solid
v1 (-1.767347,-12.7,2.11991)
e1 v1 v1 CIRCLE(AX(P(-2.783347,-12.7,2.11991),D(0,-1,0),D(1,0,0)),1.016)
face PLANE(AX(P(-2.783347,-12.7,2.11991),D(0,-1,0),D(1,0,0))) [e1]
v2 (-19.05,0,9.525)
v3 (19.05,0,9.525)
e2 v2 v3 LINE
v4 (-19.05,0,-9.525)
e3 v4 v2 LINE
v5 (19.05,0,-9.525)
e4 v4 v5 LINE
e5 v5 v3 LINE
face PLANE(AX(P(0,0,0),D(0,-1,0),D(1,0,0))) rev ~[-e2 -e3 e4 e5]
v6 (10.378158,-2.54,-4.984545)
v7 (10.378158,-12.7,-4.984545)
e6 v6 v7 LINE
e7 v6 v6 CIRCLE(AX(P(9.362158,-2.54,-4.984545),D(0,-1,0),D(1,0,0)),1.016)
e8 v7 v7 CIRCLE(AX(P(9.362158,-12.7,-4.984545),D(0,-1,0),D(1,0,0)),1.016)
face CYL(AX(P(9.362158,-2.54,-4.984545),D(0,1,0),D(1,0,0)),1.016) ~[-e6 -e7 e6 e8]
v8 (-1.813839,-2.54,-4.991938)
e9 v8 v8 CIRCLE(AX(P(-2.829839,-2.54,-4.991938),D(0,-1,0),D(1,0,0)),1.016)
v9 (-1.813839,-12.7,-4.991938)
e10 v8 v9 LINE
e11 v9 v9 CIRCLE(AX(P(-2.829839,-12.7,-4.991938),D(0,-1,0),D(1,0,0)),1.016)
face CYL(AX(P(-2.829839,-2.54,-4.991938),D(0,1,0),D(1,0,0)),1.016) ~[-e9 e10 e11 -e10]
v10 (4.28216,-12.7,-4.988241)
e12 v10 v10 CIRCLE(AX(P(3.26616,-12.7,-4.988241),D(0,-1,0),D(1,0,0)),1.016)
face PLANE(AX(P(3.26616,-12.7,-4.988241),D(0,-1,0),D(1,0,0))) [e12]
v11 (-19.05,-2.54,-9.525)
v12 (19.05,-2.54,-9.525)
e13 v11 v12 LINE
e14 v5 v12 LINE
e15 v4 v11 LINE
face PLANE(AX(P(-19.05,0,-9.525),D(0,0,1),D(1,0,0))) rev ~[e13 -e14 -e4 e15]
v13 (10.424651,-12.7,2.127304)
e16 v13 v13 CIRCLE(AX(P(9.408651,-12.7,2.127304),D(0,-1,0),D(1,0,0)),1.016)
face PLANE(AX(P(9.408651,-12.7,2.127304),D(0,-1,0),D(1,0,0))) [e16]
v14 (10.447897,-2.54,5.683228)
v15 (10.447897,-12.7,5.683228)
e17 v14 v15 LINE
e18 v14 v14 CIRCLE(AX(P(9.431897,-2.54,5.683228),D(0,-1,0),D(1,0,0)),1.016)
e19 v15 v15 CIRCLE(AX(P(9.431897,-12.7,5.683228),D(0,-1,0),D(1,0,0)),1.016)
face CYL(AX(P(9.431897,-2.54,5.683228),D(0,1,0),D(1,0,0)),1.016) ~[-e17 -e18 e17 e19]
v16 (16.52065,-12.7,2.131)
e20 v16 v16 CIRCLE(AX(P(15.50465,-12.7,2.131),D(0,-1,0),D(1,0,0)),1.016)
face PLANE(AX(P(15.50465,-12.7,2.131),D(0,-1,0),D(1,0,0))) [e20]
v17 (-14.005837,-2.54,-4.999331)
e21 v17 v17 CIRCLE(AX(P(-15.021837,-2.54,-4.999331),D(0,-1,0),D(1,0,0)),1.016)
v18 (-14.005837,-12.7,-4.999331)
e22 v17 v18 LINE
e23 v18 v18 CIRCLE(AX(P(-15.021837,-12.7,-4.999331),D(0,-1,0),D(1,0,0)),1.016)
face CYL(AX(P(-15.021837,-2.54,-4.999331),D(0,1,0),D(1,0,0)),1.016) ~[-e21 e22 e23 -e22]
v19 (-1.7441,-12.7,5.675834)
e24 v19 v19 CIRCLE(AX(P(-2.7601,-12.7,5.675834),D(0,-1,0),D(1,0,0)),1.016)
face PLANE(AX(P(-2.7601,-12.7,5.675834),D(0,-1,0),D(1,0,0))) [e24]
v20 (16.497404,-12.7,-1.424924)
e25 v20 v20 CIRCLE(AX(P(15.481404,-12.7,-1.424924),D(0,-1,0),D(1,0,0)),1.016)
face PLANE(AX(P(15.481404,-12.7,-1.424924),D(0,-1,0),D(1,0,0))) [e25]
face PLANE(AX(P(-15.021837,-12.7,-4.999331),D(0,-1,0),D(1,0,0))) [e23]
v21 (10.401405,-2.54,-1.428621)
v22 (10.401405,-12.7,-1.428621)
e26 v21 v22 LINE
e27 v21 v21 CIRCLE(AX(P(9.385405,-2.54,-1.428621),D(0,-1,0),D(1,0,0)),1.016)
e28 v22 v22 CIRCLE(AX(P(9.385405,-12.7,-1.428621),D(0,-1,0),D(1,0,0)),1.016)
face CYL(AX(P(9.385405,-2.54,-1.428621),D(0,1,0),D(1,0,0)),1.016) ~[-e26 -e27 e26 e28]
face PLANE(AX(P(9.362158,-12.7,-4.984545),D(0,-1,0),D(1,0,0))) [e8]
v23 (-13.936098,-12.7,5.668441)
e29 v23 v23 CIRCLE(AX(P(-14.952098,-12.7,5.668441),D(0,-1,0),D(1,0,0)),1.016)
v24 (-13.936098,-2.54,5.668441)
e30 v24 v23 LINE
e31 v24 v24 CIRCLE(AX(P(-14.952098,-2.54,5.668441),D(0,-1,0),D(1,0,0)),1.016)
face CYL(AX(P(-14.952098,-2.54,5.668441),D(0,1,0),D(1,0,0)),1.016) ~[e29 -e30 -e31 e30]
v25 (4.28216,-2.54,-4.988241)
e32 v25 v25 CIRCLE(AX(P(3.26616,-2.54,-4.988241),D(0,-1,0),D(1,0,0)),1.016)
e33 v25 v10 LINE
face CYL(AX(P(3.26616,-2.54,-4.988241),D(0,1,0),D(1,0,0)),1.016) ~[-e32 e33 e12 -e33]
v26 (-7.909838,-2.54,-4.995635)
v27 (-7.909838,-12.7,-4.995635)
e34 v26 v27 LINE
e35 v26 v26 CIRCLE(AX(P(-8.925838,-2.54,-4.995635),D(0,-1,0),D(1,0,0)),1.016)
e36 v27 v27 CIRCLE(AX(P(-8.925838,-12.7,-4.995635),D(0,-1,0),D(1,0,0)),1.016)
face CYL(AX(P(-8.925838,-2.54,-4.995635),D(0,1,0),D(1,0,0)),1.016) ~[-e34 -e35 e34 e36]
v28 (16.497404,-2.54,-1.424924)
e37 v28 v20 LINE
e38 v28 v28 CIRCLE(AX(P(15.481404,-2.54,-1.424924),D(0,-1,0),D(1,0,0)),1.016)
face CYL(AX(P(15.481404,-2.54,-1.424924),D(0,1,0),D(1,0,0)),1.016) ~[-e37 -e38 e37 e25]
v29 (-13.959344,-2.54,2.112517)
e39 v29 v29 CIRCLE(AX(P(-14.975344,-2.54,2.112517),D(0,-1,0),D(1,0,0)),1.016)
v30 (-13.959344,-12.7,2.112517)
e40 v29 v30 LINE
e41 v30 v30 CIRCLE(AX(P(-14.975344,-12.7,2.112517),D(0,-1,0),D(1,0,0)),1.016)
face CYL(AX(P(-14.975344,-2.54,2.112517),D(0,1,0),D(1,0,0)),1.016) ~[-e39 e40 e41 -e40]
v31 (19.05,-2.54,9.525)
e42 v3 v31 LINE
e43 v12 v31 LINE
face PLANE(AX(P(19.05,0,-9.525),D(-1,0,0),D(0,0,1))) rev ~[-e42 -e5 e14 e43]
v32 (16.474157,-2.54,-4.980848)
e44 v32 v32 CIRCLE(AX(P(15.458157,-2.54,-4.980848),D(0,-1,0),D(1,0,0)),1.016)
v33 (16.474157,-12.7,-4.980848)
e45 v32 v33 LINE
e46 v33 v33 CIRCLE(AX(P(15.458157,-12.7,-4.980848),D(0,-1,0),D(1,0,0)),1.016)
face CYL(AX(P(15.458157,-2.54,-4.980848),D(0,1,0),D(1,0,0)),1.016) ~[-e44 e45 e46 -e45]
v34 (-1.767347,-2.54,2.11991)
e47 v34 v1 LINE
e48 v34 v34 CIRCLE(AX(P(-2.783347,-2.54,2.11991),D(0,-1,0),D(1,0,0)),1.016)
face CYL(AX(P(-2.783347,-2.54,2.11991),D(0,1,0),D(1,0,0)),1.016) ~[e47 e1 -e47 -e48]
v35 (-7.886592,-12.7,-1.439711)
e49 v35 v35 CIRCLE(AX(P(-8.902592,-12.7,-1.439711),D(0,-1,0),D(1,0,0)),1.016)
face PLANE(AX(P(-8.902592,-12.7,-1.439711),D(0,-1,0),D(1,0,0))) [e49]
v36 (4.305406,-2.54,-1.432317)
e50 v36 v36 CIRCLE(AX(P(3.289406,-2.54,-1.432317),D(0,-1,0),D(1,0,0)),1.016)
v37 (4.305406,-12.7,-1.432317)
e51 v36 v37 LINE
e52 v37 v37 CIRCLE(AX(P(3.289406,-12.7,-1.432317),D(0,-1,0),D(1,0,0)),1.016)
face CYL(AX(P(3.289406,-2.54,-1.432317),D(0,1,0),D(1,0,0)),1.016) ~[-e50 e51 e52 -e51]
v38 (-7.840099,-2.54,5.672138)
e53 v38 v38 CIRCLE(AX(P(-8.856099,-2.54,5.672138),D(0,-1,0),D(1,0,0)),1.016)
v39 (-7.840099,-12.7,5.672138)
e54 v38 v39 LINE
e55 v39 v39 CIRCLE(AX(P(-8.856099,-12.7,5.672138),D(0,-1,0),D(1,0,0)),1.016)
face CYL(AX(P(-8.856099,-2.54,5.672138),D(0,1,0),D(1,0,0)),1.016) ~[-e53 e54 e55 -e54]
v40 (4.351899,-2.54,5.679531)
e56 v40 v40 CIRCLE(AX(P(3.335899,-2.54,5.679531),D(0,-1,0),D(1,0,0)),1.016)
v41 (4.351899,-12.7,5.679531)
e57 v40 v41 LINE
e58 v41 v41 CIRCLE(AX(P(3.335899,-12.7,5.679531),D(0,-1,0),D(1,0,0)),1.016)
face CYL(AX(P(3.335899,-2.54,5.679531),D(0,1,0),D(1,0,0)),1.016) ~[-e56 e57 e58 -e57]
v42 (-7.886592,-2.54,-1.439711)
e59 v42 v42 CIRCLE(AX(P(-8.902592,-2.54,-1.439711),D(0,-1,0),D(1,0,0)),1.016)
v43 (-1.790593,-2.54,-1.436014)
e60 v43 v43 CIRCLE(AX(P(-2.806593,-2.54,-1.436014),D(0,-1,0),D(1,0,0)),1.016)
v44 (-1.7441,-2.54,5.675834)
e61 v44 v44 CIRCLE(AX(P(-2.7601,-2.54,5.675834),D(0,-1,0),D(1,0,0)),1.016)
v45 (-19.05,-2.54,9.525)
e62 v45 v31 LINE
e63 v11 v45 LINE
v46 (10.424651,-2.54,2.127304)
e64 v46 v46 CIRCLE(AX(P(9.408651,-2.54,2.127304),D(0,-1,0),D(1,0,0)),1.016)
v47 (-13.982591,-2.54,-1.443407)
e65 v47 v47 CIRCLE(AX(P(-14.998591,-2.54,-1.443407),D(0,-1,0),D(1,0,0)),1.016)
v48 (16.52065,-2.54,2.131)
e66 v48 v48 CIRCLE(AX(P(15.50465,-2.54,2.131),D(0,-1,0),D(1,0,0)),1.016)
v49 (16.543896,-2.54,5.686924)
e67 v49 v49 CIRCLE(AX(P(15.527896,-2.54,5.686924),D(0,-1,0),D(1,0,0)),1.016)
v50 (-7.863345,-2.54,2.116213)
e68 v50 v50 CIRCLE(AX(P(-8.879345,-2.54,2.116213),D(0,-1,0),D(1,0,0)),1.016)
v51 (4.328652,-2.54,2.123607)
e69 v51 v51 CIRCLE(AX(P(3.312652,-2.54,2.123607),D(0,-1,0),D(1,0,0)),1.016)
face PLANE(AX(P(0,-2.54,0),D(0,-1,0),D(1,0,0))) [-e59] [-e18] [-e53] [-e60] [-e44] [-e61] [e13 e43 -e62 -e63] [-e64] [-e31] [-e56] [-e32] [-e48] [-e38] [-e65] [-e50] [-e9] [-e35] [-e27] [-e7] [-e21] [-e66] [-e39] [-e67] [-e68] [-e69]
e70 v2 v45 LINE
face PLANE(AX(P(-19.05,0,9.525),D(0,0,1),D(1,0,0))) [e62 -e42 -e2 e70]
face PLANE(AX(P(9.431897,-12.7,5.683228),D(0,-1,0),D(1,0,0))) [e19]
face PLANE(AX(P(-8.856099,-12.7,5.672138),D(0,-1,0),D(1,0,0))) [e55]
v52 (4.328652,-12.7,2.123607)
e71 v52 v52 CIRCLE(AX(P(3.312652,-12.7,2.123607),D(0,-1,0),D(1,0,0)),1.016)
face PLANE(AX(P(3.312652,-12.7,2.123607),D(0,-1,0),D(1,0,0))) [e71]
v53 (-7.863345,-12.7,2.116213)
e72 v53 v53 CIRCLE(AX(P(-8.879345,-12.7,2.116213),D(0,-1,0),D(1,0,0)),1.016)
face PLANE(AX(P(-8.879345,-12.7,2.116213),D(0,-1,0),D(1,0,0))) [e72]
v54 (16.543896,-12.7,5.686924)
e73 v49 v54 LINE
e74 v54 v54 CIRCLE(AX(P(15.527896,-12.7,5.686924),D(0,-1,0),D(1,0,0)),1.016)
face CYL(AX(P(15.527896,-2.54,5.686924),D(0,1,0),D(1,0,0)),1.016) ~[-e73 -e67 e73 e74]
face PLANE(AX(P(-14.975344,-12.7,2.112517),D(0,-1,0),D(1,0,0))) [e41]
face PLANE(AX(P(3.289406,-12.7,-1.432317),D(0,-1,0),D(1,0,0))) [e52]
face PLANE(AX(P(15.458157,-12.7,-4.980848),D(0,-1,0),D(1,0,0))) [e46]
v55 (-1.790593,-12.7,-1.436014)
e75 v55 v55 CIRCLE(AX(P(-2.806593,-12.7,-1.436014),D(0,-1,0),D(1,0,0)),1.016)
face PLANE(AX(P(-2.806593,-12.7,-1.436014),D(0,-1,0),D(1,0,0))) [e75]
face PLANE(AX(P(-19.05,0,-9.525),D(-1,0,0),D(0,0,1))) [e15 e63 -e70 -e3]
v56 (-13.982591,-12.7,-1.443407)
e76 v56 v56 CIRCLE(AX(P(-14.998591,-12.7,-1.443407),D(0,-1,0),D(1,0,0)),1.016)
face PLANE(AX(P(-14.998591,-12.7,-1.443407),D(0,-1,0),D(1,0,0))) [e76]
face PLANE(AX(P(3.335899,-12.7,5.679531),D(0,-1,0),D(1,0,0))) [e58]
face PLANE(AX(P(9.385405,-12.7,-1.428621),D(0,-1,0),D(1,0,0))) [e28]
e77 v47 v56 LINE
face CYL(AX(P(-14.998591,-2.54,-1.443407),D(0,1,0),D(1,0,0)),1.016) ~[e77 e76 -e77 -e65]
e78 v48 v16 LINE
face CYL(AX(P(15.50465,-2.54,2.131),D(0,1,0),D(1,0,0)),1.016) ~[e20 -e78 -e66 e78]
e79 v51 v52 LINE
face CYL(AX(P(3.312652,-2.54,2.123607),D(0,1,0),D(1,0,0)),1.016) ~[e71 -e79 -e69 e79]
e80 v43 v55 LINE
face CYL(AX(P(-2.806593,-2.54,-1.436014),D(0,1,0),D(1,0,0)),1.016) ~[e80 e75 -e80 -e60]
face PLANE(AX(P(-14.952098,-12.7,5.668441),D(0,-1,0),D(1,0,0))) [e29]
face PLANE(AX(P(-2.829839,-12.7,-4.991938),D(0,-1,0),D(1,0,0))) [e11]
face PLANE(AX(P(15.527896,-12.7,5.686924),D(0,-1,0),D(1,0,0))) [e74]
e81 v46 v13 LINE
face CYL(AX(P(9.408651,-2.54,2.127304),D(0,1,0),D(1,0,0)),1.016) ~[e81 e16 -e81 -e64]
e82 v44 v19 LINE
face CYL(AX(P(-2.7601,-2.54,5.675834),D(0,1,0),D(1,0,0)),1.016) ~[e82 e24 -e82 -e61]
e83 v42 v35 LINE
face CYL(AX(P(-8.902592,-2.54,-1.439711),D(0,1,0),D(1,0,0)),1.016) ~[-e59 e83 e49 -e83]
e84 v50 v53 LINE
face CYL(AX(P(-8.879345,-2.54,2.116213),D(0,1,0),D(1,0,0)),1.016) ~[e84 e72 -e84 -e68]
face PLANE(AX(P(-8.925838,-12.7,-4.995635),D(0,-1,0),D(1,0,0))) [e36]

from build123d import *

# Parameters (mm, degrees)
F0_W     = 38.1
F0_H     = 19.05
F1_DEPTH = 2.54
F2_R     = 1.016
F3_DEPTH = 10.16
F4_DEPTH = 10.16


# Not quite as in the source:
# - a feature names something its author has since deleted; it is built from what else it names


with BuildPart() as f1:
    # F0 (on Front) → F1 (new body)
    with BuildSketch(Plane.XZ):
        Rectangle(F0_W, F0_H)
    extrude(amount=F1_DEPTH)

    # F2 (on face) → F3 (join)
    with BuildSketch(Plane.XZ.offset(2.54)):
        with Locations((-14.9520980194, 5.6684408337)):
            Circle(F2_R)
        with Locations((-8.8560991403, 5.6721375078)):
            Circle(F2_R)
        with Locations((-8.8793454933, 2.1162134919)):
            Circle(F2_R)
        with Locations((-14.9753443725, 2.1125168178)):
            Circle(F2_R)
        with Locations((-14.9985907255, -1.4434071982)):
            Circle(F2_R)
        with Locations((-8.9025918464, -1.439710524)):
            Circle(F2_R)
        with Locations((-8.9258381994, -4.99563454)):
            Circle(F2_R)
        with Locations((-15.0218370786, -4.9993312141)):
            Circle(F2_R)
        with Locations((-2.8298393203, -4.9919378658)):
            Circle(F2_R)
        with Locations((-2.8065929672, -1.4360138499)):
            Circle(F2_R)
        with Locations((-2.7833466142, 2.119910166)):
            Circle(F2_R)
        with Locations((-2.7601002611, 5.675834182)):
            Circle(F2_R)
        with Locations((3.335898618, 5.6795308561)):
            Circle(F2_R)
        with Locations((3.312652265, 2.1236068402)):
            Circle(F2_R)
        with Locations((3.2894059119, -1.4323171757)):
            Circle(F2_R)
        with Locations((3.2661595589, -4.9882411917)):
            Circle(F2_R)
    extrude(amount=F3_DEPTH)

    # F2 (on face) → F4 (join)
    with BuildSketch(Plane.XZ.offset(2.54)):
        with Locations((9.4318974972, 5.6832275303)):
            Circle(F2_R)
        with Locations((9.4086511441, 2.1273035143)):
            Circle(F2_R)
        with Locations((9.3854047911, -1.4286205016)):
            Circle(F2_R)
        with Locations((9.362158438, -4.9845445175)):
            Circle(F2_R)
        with Locations((15.4581573172, -4.9808478434)):
            Circle(F2_R)
        with Locations((15.4814036702, -1.4249238275)):
            Circle(F2_R)
        with Locations((15.5046500233, 2.1310001885)):
            Circle(F2_R)
        with Locations((15.5278963763, 5.6869242044)):
            Circle(F2_R)
    extrude(amount=F4_DEPTH)


solid = f1.part
